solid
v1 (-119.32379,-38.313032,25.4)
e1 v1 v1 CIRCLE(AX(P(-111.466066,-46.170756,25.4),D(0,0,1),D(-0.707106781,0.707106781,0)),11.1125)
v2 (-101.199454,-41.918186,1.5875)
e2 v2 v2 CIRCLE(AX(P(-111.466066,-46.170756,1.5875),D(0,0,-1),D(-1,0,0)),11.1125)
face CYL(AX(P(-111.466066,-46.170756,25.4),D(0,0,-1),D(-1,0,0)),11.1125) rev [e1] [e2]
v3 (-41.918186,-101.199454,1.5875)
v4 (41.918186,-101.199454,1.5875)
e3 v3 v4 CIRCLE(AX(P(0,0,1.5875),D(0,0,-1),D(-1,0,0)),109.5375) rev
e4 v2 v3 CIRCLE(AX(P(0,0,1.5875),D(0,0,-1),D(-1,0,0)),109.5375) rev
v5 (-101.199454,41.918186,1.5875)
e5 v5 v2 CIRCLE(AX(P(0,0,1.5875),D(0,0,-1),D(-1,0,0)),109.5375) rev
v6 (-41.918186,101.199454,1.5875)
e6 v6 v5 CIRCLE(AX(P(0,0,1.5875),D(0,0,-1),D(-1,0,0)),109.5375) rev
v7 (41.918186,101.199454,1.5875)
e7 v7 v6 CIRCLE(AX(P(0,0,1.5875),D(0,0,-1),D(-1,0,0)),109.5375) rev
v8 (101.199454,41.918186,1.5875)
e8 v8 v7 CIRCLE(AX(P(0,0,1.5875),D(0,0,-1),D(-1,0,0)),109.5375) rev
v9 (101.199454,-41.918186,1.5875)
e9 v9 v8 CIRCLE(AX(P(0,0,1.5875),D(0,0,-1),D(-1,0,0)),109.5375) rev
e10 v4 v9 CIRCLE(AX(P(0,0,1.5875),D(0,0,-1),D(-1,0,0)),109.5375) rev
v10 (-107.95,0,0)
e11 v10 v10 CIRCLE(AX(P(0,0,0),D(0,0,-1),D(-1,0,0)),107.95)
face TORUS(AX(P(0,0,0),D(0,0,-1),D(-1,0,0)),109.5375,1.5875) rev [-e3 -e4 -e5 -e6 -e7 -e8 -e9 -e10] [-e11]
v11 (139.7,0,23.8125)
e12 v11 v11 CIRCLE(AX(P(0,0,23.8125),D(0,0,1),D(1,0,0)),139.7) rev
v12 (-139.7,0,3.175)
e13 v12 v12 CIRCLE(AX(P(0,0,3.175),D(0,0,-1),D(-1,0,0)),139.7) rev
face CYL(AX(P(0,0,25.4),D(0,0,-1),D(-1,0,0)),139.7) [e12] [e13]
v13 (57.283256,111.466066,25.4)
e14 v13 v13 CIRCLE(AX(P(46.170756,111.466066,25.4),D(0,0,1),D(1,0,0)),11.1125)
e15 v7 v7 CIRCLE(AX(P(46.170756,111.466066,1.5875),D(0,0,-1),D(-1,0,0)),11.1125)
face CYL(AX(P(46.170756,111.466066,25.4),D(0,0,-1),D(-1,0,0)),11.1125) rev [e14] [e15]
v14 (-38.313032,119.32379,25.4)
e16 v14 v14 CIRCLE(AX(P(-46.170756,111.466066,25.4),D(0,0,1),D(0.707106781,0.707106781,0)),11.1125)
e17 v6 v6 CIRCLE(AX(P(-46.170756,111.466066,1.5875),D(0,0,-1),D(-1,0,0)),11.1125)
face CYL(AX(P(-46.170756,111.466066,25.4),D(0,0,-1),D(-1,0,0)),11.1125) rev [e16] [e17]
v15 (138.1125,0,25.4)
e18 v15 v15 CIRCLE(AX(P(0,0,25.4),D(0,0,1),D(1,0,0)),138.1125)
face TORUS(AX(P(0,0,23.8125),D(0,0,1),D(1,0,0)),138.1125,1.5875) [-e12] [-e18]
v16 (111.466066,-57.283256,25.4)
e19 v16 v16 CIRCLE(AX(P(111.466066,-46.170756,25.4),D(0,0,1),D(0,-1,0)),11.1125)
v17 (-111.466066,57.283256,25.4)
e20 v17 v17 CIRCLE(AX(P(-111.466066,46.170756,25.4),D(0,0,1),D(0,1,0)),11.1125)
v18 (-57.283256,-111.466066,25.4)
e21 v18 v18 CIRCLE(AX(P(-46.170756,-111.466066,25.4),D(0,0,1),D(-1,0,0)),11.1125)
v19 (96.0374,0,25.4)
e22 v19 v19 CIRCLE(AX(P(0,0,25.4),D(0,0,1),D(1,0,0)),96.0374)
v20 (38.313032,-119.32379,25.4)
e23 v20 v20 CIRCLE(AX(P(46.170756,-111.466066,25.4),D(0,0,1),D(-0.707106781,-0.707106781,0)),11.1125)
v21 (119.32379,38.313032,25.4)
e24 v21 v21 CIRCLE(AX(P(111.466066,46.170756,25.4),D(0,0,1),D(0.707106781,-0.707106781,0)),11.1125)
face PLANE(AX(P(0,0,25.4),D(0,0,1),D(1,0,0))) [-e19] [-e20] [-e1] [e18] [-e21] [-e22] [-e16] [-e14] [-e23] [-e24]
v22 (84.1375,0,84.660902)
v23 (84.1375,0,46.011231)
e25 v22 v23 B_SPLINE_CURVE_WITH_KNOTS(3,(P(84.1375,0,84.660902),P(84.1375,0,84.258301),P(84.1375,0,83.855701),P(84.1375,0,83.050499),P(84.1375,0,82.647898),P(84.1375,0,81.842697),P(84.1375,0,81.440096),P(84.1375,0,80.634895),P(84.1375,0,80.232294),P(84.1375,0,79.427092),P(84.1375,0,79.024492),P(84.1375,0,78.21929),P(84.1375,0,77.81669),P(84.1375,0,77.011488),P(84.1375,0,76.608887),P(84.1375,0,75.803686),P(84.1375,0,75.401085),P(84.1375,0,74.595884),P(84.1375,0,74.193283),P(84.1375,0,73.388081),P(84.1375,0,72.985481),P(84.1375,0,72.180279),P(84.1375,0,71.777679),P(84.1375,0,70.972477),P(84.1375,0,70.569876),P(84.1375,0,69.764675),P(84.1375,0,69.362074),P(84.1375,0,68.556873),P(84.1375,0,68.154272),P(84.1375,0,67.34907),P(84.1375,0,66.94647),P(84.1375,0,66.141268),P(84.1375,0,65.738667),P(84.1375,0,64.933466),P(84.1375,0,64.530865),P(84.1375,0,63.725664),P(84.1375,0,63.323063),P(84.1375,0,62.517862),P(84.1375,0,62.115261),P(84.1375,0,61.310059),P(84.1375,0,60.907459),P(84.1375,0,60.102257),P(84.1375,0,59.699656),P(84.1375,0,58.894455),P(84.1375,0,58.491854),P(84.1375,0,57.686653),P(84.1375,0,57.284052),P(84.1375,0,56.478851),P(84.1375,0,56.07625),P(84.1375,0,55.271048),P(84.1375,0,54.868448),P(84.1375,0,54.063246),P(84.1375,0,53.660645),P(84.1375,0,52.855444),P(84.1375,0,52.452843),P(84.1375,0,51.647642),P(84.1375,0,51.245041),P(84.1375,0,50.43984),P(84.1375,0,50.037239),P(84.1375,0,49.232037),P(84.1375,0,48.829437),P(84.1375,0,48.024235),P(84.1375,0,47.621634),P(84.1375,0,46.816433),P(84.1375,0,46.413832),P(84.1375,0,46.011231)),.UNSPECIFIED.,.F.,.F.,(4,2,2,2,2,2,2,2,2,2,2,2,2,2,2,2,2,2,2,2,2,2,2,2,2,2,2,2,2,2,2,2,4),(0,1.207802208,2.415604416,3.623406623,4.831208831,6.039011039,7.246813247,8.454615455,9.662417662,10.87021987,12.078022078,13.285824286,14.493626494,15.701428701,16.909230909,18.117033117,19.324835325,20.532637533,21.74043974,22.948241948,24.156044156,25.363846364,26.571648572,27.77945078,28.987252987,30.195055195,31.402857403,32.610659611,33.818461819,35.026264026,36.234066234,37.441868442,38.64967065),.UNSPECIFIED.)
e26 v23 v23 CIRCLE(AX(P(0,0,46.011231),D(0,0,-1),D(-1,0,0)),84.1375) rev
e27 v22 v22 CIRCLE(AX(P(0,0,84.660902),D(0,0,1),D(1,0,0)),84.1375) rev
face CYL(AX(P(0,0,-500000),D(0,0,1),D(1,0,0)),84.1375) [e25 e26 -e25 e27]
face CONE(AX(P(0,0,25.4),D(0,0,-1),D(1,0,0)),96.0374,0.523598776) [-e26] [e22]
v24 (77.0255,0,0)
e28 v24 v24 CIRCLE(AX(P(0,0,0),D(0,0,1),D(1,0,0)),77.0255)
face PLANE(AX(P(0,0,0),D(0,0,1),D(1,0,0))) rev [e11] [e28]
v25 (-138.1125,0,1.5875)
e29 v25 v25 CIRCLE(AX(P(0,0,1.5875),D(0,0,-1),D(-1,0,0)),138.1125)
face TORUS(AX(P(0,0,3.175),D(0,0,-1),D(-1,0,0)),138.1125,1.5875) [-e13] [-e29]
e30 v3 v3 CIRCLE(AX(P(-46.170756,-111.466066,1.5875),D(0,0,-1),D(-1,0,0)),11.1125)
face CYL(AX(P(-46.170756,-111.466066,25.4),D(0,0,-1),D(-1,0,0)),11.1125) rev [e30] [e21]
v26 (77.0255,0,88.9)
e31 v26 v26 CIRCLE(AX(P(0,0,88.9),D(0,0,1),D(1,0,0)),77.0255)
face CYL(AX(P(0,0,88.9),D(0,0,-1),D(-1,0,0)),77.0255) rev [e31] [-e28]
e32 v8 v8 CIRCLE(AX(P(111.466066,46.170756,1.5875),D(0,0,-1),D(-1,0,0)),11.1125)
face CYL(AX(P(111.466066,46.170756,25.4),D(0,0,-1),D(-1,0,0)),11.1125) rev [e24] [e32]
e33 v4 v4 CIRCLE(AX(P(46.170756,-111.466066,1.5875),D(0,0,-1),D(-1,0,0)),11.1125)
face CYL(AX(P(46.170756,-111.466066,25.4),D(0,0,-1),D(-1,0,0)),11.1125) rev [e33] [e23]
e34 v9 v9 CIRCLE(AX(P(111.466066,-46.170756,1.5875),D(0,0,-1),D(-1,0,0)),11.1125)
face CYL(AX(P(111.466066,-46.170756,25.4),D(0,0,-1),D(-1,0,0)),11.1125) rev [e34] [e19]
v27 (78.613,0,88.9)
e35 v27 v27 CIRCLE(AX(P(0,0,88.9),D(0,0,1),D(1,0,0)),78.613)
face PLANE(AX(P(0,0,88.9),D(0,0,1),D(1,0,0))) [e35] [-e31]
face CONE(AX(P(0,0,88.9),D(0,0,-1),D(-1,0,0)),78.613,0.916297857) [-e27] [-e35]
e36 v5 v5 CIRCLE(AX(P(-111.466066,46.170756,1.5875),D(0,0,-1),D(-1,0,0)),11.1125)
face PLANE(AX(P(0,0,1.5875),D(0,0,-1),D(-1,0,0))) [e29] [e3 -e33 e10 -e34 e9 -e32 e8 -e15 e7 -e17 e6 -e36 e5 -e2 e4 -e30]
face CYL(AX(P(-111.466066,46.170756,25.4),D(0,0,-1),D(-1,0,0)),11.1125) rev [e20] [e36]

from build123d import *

# Parameters (mm, degrees)
SKETCH1_R                 = 139.7
BOSS_EXTRUDE1_DEPTH       = 25.4
SKETCH2_R                 = 11.1125
BOLTHOLE_DEPTH            = 200.191716695
BOLTHOLEPATTERN_COUNT     = 8
SKETCH5_OUTSIDE_W         = 360.59
SKETCH5_OUTSIDE_H         = 360.59
SKETCH5_OUTSIDE_R         = 107.95
RAISED_FACE_DEPTH         = 1.5875
SKETCH8_R                 = 96.0374
WELD_NECK_120_DRAFT_DEPTH = 63.5
WELD_NECK_120_DRAFT_TAPER = 30
WELD_NECK_END_REACH       = 218.646
SKETCH9_R                 = 84.1375
WELD_NECK_CHAMFER1_SIZE   = 4.239097945
WELD_NECK_CHAMFER1_SIZE2  = 5.5245
SKETCH7_R                 = 77.0255
BORE_DEPTH                = 217.645770787
FILLET2_R                 = 1.5875
FILLET3_R                 = 1.5875


with BuildPart() as part:
    # Sketch1 → Boss-Extrude1 (new body)
    with BuildSketch(Plane.XY):
        Circle(SKETCH1_R)
    extrude(amount=BOSS_EXTRUDE1_DEPTH)

    # Sketch2 → BoltHole (cut, through all)
    with BuildSketch(Plane.XY):
        with Locations((46.170756115, 111.466065597)):
            Circle(SKETCH2_R)
    bolthole = extrude(amount=BOLTHOLE_DEPTH, mode=Mode.SUBTRACT)

    # BoltHolePattern: BoltHole ×8 about axis
    boltholepattern_axis = Axis((0, 0, 0), (0, 0, 1))
    for i in range(1, BOLTHOLEPATTERN_COUNT):
        add(bolthole.rotate(boltholepattern_axis, i * 360 / BOLTHOLEPATTERN_COUNT), mode=Mode.SUBTRACT)

    # Sketch5 outside → Raised Face (cut)
    with BuildSketch(Plane(origin=(0, 0, 0), x_dir=(-1, 0, 0), z_dir=(0, 0, -1))):
        Rectangle(SKETCH5_OUTSIDE_W, SKETCH5_OUTSIDE_H)
        Circle(SKETCH5_OUTSIDE_R, mode=Mode.SUBTRACT)
    extrude(amount=-RAISED_FACE_DEPTH, mode=Mode.SUBTRACT)

    # Sketch8 → Weld Neck 120 Draft (add)
    with BuildSketch(Plane.XY.offset(25.4)):
        Circle(SKETCH8_R)
    extrude(amount=WELD_NECK_120_DRAFT_DEPTH, taper=WELD_NECK_120_DRAFT_TAPER)

    # Sketch9 → Weld Neck End (add, up to next)
    with BuildSketch(Plane.XY.offset(88.9), mode=Mode.PRIVATE) as weld_neck_end_sk1:
        Circle(SKETCH9_R)
    weld_neck_end_tool1 = extrude(weld_neck_end_sk1.sketch, amount=-WELD_NECK_END_REACH, mode=Mode.PRIVATE) - part.part
    add(weld_neck_end_tool1.solids().sort_by_distance((0, 0, 88.9))[0])

    # Weld Neck Chamfer1
    weld_neck_chamfer1_edges = [part.edges().sort_by_distance(p)[0] for p in [
        (-84.1375, 0, 88.9),
    ]]
    weld_neck_chamfer1_side = [part.faces().sort_by_distance(p)[0] for p in [
        (-84.1375, 0, 67.455615702),
    ]]
    chamfer(weld_neck_chamfer1_edges, length=WELD_NECK_CHAMFER1_SIZE, length2=WELD_NECK_CHAMFER1_SIZE2, reference=weld_neck_chamfer1_side[0])

    # Sketch7 → Bore (cut, through all)
    with BuildSketch(Plane.XY):
        Circle(SKETCH7_R)
    extrude(amount=BORE_DEPTH, mode=Mode.SUBTRACT)

    # Fillet2
    fillet2_edges = [part.edges().sort_by_distance(p)[0] for p in [
        (-139.7, 0, 25.4),
        (-139.7, 0, 1.5875),
    ]]
    fillet(fillet2_edges, radius=FILLET2_R)

    # Fillet3
    fillet3_edges = [part.edges().sort_by_distance(p)[0] for p in [
        (107.95, 0, 1.5875),
    ]]
    fillet(fillet3_edges, radius=FILLET3_R - 0.0001)  # a hair under: the kernel refuses the full size


solid = part.part
